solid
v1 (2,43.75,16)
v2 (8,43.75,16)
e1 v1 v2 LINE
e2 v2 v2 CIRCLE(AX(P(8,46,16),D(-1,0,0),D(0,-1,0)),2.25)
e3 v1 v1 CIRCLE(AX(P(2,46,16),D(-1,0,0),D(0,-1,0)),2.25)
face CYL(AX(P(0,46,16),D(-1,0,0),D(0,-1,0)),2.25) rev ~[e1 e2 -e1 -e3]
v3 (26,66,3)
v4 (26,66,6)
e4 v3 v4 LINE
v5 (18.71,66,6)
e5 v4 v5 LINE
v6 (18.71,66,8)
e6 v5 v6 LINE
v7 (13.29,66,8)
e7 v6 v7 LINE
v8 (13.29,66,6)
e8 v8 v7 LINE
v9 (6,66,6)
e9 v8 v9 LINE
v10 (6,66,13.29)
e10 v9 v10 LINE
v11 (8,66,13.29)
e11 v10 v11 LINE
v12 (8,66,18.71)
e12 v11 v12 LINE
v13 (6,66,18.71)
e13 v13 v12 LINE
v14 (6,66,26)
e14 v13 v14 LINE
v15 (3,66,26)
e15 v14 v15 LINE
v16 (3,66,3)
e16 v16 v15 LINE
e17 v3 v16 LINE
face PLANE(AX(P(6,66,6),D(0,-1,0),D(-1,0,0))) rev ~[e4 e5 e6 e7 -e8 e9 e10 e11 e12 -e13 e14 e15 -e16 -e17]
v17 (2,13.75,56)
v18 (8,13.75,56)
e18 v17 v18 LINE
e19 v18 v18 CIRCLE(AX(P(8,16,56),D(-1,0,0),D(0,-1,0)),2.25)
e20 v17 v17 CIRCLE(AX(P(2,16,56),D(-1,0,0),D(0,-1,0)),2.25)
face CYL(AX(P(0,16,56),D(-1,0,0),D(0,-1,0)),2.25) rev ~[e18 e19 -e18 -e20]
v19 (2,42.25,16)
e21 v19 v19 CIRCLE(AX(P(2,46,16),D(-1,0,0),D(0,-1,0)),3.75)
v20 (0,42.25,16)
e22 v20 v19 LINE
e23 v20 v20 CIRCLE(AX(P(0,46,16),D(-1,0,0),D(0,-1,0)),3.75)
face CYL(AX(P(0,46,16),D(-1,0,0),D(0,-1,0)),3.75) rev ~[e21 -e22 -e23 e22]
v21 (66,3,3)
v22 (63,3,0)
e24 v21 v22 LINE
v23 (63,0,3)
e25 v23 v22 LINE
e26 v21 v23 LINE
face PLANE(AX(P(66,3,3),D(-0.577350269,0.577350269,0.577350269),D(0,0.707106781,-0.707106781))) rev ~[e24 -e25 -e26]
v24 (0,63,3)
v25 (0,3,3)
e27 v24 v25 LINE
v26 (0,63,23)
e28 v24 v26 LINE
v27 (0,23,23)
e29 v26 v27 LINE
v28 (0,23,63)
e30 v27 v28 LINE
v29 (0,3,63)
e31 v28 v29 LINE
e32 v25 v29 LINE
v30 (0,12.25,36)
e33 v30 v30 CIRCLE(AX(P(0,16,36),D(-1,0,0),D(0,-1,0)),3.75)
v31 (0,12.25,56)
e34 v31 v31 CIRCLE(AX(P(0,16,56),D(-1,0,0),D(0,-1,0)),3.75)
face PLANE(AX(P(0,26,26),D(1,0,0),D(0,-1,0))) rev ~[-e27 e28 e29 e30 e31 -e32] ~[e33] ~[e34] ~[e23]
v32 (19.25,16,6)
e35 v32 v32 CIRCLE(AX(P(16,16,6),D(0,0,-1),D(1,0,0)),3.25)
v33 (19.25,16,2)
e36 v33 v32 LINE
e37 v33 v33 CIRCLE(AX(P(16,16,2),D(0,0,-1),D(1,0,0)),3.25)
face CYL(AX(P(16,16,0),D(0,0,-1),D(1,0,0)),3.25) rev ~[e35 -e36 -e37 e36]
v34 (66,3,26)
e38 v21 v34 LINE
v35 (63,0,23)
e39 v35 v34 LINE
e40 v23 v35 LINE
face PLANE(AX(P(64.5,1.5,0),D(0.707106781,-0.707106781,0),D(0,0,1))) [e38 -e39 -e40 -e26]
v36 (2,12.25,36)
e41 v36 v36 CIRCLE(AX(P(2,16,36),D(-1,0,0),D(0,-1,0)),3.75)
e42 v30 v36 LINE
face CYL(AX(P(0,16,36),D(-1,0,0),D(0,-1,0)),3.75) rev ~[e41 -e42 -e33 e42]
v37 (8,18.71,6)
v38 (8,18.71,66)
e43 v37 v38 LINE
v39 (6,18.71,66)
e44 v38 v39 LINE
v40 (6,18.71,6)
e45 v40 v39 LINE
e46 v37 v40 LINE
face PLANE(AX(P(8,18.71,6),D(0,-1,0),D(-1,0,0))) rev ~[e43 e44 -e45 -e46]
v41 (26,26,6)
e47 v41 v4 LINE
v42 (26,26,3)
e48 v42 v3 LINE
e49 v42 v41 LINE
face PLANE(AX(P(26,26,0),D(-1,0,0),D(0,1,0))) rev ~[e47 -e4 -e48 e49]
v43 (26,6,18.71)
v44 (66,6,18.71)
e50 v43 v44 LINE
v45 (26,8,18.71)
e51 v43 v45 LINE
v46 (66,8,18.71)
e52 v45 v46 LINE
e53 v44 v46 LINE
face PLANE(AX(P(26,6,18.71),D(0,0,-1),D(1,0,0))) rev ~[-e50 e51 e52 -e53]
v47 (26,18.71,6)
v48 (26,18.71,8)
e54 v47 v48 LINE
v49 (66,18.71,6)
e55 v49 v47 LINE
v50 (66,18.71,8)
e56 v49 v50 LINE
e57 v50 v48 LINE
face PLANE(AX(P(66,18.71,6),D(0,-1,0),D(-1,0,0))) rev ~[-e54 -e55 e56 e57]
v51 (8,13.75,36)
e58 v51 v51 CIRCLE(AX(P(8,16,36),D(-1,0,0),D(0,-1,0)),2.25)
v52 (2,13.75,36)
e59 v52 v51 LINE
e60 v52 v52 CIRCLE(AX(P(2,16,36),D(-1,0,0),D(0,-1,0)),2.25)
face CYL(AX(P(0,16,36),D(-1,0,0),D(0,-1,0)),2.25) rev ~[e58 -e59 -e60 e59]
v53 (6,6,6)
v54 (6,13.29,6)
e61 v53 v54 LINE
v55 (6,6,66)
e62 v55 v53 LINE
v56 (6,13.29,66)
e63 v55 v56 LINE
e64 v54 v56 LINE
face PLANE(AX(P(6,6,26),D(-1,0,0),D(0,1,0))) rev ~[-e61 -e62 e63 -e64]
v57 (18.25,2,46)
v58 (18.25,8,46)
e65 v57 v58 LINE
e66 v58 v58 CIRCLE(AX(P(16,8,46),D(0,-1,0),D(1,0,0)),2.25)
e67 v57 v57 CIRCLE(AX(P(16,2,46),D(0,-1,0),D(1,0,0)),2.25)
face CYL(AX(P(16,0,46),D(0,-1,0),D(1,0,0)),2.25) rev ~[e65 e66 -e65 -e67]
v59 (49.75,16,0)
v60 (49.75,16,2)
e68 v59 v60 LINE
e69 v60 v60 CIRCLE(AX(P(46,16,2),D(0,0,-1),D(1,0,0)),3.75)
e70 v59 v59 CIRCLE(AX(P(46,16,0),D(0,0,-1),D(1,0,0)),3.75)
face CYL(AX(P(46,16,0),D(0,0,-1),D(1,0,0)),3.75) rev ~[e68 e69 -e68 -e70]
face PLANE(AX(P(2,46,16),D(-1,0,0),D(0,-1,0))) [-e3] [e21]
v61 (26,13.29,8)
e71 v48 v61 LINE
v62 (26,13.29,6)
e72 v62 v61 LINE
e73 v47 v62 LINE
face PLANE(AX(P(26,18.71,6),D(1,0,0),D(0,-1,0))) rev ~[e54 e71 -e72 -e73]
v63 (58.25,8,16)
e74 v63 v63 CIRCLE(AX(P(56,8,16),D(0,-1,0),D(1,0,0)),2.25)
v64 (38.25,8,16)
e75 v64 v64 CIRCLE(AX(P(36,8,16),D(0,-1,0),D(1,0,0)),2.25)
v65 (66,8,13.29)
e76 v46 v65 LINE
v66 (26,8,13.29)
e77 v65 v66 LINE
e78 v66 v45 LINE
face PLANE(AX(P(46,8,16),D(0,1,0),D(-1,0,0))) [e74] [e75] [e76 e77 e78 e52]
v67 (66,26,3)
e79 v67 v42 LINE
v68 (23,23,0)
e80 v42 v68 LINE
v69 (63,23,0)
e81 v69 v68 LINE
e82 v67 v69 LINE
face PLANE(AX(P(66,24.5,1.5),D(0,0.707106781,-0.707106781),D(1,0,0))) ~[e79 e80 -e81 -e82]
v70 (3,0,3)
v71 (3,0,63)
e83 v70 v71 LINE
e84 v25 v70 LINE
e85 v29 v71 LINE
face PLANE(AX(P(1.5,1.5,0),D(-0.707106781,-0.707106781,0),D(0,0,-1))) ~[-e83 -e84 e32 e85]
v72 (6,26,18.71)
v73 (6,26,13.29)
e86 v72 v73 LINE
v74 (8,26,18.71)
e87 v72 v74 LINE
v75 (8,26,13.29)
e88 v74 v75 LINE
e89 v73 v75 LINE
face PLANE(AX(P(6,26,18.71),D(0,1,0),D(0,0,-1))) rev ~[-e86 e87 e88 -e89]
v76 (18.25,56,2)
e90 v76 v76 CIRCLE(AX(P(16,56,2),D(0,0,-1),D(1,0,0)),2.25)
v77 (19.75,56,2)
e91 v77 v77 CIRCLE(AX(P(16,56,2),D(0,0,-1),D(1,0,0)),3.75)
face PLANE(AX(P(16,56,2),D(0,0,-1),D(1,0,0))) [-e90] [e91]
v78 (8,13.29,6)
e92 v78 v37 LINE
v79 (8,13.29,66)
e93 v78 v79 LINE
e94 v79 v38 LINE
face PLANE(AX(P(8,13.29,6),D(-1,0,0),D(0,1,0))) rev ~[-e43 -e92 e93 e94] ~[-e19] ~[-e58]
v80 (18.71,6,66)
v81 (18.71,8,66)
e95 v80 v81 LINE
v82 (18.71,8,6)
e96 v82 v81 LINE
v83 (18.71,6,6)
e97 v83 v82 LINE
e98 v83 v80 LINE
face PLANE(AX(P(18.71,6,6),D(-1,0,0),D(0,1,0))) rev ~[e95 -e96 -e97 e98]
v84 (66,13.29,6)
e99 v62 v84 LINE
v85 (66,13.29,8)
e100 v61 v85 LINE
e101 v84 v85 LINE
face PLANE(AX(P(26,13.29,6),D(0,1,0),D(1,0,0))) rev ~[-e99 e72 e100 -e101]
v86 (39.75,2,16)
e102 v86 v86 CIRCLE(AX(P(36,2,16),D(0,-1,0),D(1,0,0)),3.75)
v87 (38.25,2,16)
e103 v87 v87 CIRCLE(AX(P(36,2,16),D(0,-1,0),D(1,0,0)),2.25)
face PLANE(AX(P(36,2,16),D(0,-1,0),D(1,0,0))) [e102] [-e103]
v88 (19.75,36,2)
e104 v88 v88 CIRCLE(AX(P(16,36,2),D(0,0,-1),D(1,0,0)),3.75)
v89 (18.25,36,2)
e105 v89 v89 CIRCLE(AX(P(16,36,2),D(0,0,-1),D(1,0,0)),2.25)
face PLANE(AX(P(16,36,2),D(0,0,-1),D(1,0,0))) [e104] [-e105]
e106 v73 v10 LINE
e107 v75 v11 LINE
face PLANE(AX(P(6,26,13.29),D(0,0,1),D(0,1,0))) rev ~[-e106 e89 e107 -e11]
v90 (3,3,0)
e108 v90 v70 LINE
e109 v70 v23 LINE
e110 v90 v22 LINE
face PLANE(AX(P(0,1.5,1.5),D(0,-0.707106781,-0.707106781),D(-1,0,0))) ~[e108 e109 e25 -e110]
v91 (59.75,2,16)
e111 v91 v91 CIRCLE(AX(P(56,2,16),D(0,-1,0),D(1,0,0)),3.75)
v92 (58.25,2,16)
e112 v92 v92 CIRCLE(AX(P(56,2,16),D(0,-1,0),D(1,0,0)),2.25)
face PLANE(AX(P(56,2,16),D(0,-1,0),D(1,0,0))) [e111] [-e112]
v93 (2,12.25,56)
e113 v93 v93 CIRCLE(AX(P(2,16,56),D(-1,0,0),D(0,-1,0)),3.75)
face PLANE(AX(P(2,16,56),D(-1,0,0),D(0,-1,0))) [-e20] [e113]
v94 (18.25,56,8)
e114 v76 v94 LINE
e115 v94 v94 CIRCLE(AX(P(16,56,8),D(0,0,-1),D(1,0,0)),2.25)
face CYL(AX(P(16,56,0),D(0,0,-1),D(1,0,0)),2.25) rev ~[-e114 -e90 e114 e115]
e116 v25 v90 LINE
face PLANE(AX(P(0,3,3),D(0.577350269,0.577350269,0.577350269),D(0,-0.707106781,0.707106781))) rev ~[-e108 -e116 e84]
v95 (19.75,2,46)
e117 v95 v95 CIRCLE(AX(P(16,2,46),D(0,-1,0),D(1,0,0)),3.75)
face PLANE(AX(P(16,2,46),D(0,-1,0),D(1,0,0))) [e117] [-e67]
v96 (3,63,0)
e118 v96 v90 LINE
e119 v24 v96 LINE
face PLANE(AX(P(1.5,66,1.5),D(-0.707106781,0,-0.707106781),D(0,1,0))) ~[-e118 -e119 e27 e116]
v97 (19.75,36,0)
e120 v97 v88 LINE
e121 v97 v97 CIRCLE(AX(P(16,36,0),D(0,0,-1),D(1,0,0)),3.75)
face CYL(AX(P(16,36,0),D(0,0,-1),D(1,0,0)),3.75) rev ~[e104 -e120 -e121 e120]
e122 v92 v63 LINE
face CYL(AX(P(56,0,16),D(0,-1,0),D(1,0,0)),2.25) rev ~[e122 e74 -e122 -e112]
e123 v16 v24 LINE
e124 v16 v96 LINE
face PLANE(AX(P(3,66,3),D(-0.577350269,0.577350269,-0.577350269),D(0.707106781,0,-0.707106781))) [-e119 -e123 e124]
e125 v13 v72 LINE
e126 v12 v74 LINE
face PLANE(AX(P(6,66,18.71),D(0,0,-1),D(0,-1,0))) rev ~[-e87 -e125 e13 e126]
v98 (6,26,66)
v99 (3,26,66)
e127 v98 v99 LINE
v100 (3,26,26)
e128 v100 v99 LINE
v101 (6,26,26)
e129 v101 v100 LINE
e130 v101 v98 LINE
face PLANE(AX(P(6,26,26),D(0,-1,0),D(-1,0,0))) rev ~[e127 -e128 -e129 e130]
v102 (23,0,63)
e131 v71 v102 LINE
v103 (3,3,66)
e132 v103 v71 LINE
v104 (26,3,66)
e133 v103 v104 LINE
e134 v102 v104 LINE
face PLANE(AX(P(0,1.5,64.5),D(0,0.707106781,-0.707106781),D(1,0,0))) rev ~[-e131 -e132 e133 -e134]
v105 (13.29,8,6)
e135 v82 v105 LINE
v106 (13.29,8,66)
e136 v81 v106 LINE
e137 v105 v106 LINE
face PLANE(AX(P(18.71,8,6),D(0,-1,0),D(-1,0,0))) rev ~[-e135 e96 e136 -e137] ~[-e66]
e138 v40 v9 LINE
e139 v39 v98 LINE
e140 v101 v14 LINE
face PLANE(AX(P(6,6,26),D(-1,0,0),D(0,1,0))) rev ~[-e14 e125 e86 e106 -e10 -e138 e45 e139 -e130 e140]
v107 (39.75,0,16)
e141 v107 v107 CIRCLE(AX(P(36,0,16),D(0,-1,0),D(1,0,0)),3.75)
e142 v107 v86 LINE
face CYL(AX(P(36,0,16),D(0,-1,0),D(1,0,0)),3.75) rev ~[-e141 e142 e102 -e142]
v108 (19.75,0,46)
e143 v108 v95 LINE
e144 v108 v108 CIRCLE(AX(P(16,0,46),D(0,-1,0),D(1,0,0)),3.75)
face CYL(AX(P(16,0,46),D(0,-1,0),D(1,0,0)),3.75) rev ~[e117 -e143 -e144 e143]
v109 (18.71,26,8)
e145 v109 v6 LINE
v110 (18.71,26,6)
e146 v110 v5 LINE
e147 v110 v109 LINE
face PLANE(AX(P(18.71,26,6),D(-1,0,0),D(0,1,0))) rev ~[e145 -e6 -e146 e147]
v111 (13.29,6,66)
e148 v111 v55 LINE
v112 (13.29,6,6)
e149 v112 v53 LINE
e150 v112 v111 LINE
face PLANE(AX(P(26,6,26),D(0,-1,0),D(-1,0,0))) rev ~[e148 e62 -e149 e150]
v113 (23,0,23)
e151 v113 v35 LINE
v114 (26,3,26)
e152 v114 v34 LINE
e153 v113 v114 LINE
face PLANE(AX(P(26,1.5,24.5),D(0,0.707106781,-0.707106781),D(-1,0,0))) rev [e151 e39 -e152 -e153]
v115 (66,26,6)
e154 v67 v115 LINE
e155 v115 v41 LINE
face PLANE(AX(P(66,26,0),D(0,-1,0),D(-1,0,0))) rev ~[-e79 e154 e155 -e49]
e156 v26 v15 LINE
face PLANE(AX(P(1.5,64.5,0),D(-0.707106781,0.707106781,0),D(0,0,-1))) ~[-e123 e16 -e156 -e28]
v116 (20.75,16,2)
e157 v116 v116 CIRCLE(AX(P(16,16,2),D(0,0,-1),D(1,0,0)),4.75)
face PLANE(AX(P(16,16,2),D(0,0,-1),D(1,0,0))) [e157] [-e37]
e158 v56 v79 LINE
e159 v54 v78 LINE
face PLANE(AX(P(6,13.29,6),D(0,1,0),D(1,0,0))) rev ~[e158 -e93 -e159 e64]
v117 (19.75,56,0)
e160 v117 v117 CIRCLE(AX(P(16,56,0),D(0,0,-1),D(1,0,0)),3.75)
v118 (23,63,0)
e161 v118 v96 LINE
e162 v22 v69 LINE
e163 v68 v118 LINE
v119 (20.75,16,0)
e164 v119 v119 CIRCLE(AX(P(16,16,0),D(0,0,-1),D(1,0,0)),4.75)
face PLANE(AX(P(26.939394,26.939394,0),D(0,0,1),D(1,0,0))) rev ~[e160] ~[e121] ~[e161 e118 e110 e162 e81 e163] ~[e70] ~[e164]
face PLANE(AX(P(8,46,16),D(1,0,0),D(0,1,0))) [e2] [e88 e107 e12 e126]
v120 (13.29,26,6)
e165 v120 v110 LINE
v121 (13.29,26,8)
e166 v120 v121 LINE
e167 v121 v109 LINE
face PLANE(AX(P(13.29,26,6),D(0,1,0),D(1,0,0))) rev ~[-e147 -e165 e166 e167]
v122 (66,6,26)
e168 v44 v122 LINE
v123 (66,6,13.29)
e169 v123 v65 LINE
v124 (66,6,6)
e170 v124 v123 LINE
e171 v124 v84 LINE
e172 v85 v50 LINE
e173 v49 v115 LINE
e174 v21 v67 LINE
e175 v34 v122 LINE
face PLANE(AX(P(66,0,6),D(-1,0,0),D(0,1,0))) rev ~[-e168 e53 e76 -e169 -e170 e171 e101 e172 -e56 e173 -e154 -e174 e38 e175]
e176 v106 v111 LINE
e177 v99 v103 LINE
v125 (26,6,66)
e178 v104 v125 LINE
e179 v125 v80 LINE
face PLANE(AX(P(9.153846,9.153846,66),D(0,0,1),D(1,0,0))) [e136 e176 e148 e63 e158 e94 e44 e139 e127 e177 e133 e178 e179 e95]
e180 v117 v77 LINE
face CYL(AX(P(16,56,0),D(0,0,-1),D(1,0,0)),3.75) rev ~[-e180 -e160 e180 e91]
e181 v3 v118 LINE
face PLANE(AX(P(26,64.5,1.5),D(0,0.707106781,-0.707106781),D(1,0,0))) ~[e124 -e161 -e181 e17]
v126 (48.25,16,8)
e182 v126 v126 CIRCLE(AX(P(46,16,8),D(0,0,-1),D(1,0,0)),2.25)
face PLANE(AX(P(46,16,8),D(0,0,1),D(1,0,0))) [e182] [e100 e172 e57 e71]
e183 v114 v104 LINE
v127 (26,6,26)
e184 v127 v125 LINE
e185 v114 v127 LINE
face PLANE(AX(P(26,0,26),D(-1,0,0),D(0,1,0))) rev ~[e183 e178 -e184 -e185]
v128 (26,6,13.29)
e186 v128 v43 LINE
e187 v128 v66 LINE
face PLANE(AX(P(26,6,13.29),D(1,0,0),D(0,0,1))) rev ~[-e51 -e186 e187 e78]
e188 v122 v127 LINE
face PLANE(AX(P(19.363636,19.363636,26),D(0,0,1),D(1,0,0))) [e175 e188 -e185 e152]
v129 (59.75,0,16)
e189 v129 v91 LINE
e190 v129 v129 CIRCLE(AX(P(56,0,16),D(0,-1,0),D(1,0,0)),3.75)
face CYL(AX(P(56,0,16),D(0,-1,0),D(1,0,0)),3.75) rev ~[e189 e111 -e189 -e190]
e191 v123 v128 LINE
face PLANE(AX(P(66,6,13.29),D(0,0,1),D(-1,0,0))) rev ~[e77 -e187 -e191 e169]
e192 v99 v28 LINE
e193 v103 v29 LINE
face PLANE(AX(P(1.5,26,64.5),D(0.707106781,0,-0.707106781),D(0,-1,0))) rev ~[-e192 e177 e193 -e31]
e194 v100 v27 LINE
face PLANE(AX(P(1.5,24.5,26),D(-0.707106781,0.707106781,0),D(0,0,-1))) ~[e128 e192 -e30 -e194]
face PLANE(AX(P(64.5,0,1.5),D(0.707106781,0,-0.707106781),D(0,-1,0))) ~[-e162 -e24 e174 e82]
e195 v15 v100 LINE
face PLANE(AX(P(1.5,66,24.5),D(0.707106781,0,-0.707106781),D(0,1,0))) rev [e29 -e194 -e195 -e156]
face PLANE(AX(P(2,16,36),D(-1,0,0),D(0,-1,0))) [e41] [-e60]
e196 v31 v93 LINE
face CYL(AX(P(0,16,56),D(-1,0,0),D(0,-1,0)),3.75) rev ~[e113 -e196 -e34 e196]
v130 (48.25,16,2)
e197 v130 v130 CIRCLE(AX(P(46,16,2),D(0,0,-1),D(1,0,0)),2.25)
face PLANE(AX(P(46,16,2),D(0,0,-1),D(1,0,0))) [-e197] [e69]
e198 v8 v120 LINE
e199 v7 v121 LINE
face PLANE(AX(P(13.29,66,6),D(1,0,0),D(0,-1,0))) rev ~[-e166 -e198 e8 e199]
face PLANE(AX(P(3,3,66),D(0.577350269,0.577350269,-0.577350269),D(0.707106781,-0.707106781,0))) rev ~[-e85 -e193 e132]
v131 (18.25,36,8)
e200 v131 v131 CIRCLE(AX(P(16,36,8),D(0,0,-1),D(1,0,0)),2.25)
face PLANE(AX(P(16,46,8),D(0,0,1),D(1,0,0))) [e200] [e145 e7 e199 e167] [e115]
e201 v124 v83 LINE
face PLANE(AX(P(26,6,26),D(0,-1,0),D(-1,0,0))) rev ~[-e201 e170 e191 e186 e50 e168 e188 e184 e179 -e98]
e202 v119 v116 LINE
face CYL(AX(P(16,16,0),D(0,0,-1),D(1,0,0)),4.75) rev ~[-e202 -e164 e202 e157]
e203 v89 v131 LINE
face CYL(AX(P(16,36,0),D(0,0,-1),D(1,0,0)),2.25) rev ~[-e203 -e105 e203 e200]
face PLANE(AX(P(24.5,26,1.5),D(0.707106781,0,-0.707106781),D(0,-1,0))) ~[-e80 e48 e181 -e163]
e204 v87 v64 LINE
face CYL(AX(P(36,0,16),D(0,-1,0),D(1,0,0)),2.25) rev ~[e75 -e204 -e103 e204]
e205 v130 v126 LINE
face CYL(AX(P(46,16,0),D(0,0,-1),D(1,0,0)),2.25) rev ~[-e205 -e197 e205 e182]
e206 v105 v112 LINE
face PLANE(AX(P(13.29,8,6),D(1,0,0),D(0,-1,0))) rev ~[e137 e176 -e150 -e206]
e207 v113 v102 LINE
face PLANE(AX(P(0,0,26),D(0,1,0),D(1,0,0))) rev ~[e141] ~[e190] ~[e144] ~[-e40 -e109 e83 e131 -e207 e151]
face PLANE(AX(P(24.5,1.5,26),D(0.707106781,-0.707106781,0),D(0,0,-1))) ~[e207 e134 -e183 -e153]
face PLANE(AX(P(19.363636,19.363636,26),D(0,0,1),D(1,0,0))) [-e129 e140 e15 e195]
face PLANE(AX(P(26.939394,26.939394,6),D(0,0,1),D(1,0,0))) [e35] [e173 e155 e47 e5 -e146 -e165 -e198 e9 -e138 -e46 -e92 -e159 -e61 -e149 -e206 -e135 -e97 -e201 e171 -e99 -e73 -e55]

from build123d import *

# Parameters (mm, degrees)
F1_DEPTH  = 6
F3_DEPTH  = 20
F5_DEPTH  = 40
F7_DEPTH  = 60
F9_DEPTH  = 2
F11_DEPTH = 2
F13_DEPTH = 2
F14_R     = 2.25
F15_DEPTH = 8
F16_R     = 2.25
F17_DEPTH = 8
F18_R     = 3.25
F18_R_2   = 2.25
F19_DEPTH = 8.001
F20_R     = 3.75
F21_DEPTH = 2
F22_R     = 3.75
F23_DEPTH = 2
F24_R     = 3.75
F24_R_2   = 4.75
F25_DEPTH = 2
F26_SIZE  = 3


with BuildPart() as f1:
    # F0 (on Top) → F1 (new body)
    with BuildSketch(Plane.XY):
        Polygon((0, 66), (0, 0), (66, 0), (66, 26), (26, 26), (26, 66), align=None)
    extrude(amount=F1_DEPTH)

    # F2 (on face) → F3 (join)
    with BuildSketch(Plane.XY.offset(6)):
        Polygon((6, 66), (0, 66), (0, 0), (66, 0), (66, 6), (6, 6), align=None)
    extrude(amount=F3_DEPTH)

    # F4 (on face) → F5 (join)
    with BuildSketch(Plane.XY.offset(26)):
        Polygon((6, 6), (6, 26), (0, 26), (0, 0), (26, 0), (26, 6), align=None)
    extrude(amount=F5_DEPTH)

    # F6 (on face) → F7 (join)
    with BuildSketch(Plane.XY.offset(6)):
        Polygon((13.29, 6), (16, 6), (18.71, 6), (18.71, 8), (13.29, 8), align=None)
        Polygon((6, 18.71), (6, 16), (6, 13.29), (8, 13.29), (8, 18.71), align=None)
    extrude(amount=F7_DEPTH)

    # F8 (on face) → F9 (join)
    with BuildSketch(Plane.XY.offset(6)):
        Polygon((66, 13.29), (66, 16), (66, 18.71), (26, 18.71), (26, 13.29), align=None)
        Polygon((18.71, 66), (16, 66), (13.29, 66), (13.29, 26), (18.71, 26), align=None)
    extrude(amount=F9_DEPTH)

    # F10 (on face) → F11 (join)
    with BuildSketch(Plane(origin=(0, 6, 0), x_dir=(-1, 0, 0), z_dir=(0, 1, 0))):
        Polygon((-66, 18.71), (-66, 16), (-66, 13.29), (-26, 13.29), (-26, 16), (-26, 18.71), align=None)
    extrude(amount=F11_DEPTH)

    # F12 (on face) → F13 (join)
    with BuildSketch(Plane.YZ.offset(6)):
        Polygon((66, 13.29), (66, 16), (66, 18.71), (26, 18.71), (26, 13.29), align=None)
    extrude(amount=F13_DEPTH)

    # F14 (on face) → F15 (cut, through all)
    with BuildSketch(Plane.XZ):
        with Locations((56, 16)):
            Circle(F14_R)
        with Locations((16, 46)):
            Circle(F14_R)
        with Locations((36, 16)):
            Circle(F14_R)
    extrude(amount=-F15_DEPTH, mode=Mode.SUBTRACT)

    # F16 (on face) → F17 (cut, through all)
    with BuildSketch(Plane(origin=(0, 0, 0), x_dir=(0, -1, 0), z_dir=(-1, 0, 0))):
        with Locations((-16, 56)):
            Circle(F16_R)
        with Locations((-46, 16)):
            Circle(F16_R)
        with Locations((-16, 36)):
            Circle(F16_R)
    extrude(amount=-F17_DEPTH, mode=Mode.SUBTRACT)

    # F18 (on face) → F19 (cut, through all)
    with BuildSketch(Plane(origin=(0, 0, 0), x_dir=(1, 0, 0), z_dir=(0, 0, -1))):
        with Locations((16, -16)):
            Circle(F18_R)
        with Locations((46, -16)):
            Circle(F18_R_2)
        with Locations((16, -56)):
            Circle(F18_R_2)
        with Locations((16, -36)):
            Circle(F18_R_2)
    extrude(amount=-F19_DEPTH, mode=Mode.SUBTRACT)

    # F20 (on face) → F21 (cut)
    with BuildSketch(Plane.XZ):
        with Locations((16, 46)):
            Circle(F20_R)
        with Locations((36, 16)):
            Circle(F20_R)
        with Locations((56, 16)):
            Circle(F20_R)
    extrude(amount=-F21_DEPTH, mode=Mode.SUBTRACT)

    # F22 (on face) → F23 (cut)
    with BuildSketch(Plane(origin=(0, 0, 0), x_dir=(0, -1, 0), z_dir=(-1, 0, 0))):
        with Locations((-16, 56)):
            Circle(F22_R)
        with Locations((-46, 16)):
            Circle(F22_R)
        with Locations((-16, 36)):
            Circle(F22_R)
    extrude(amount=-F23_DEPTH, mode=Mode.SUBTRACT)

    # F24 (on face) → F25 (cut)
    with BuildSketch(Plane(origin=(0, 0, 0), x_dir=(1, 0, 0), z_dir=(0, 0, -1))):
        with Locations((16, -56)):
            Circle(F24_R)
        with Locations((16, -16)):
            Circle(F24_R_2)
        with Locations((46, -16)):
            Circle(F24_R)
        with Locations((16, -36)):
            Circle(F24_R)
    extrude(amount=-F25_DEPTH, mode=Mode.SUBTRACT)

    # F26
    f26_edges = [f1.edges().sort_by_distance(p)[0] for p in [
        (33, 0, 0),
        (0, 33, 0),
        (0, 0, 33),
        (0, 26, 46),
        (0, 46, 26),
        (26, 0, 46),
        (46, 0, 26),
        (0, 13, 66),
        (13, 0, 66),
        (0, 66, 13),
        (13, 66, 0),
        (66, 0, 13),
        (66, 13, 0),
        (46, 26, 0),
        (26, 46, 0),
    ]]
    chamfer(f26_edges, length=F26_SIZE)


solid = f1.part
